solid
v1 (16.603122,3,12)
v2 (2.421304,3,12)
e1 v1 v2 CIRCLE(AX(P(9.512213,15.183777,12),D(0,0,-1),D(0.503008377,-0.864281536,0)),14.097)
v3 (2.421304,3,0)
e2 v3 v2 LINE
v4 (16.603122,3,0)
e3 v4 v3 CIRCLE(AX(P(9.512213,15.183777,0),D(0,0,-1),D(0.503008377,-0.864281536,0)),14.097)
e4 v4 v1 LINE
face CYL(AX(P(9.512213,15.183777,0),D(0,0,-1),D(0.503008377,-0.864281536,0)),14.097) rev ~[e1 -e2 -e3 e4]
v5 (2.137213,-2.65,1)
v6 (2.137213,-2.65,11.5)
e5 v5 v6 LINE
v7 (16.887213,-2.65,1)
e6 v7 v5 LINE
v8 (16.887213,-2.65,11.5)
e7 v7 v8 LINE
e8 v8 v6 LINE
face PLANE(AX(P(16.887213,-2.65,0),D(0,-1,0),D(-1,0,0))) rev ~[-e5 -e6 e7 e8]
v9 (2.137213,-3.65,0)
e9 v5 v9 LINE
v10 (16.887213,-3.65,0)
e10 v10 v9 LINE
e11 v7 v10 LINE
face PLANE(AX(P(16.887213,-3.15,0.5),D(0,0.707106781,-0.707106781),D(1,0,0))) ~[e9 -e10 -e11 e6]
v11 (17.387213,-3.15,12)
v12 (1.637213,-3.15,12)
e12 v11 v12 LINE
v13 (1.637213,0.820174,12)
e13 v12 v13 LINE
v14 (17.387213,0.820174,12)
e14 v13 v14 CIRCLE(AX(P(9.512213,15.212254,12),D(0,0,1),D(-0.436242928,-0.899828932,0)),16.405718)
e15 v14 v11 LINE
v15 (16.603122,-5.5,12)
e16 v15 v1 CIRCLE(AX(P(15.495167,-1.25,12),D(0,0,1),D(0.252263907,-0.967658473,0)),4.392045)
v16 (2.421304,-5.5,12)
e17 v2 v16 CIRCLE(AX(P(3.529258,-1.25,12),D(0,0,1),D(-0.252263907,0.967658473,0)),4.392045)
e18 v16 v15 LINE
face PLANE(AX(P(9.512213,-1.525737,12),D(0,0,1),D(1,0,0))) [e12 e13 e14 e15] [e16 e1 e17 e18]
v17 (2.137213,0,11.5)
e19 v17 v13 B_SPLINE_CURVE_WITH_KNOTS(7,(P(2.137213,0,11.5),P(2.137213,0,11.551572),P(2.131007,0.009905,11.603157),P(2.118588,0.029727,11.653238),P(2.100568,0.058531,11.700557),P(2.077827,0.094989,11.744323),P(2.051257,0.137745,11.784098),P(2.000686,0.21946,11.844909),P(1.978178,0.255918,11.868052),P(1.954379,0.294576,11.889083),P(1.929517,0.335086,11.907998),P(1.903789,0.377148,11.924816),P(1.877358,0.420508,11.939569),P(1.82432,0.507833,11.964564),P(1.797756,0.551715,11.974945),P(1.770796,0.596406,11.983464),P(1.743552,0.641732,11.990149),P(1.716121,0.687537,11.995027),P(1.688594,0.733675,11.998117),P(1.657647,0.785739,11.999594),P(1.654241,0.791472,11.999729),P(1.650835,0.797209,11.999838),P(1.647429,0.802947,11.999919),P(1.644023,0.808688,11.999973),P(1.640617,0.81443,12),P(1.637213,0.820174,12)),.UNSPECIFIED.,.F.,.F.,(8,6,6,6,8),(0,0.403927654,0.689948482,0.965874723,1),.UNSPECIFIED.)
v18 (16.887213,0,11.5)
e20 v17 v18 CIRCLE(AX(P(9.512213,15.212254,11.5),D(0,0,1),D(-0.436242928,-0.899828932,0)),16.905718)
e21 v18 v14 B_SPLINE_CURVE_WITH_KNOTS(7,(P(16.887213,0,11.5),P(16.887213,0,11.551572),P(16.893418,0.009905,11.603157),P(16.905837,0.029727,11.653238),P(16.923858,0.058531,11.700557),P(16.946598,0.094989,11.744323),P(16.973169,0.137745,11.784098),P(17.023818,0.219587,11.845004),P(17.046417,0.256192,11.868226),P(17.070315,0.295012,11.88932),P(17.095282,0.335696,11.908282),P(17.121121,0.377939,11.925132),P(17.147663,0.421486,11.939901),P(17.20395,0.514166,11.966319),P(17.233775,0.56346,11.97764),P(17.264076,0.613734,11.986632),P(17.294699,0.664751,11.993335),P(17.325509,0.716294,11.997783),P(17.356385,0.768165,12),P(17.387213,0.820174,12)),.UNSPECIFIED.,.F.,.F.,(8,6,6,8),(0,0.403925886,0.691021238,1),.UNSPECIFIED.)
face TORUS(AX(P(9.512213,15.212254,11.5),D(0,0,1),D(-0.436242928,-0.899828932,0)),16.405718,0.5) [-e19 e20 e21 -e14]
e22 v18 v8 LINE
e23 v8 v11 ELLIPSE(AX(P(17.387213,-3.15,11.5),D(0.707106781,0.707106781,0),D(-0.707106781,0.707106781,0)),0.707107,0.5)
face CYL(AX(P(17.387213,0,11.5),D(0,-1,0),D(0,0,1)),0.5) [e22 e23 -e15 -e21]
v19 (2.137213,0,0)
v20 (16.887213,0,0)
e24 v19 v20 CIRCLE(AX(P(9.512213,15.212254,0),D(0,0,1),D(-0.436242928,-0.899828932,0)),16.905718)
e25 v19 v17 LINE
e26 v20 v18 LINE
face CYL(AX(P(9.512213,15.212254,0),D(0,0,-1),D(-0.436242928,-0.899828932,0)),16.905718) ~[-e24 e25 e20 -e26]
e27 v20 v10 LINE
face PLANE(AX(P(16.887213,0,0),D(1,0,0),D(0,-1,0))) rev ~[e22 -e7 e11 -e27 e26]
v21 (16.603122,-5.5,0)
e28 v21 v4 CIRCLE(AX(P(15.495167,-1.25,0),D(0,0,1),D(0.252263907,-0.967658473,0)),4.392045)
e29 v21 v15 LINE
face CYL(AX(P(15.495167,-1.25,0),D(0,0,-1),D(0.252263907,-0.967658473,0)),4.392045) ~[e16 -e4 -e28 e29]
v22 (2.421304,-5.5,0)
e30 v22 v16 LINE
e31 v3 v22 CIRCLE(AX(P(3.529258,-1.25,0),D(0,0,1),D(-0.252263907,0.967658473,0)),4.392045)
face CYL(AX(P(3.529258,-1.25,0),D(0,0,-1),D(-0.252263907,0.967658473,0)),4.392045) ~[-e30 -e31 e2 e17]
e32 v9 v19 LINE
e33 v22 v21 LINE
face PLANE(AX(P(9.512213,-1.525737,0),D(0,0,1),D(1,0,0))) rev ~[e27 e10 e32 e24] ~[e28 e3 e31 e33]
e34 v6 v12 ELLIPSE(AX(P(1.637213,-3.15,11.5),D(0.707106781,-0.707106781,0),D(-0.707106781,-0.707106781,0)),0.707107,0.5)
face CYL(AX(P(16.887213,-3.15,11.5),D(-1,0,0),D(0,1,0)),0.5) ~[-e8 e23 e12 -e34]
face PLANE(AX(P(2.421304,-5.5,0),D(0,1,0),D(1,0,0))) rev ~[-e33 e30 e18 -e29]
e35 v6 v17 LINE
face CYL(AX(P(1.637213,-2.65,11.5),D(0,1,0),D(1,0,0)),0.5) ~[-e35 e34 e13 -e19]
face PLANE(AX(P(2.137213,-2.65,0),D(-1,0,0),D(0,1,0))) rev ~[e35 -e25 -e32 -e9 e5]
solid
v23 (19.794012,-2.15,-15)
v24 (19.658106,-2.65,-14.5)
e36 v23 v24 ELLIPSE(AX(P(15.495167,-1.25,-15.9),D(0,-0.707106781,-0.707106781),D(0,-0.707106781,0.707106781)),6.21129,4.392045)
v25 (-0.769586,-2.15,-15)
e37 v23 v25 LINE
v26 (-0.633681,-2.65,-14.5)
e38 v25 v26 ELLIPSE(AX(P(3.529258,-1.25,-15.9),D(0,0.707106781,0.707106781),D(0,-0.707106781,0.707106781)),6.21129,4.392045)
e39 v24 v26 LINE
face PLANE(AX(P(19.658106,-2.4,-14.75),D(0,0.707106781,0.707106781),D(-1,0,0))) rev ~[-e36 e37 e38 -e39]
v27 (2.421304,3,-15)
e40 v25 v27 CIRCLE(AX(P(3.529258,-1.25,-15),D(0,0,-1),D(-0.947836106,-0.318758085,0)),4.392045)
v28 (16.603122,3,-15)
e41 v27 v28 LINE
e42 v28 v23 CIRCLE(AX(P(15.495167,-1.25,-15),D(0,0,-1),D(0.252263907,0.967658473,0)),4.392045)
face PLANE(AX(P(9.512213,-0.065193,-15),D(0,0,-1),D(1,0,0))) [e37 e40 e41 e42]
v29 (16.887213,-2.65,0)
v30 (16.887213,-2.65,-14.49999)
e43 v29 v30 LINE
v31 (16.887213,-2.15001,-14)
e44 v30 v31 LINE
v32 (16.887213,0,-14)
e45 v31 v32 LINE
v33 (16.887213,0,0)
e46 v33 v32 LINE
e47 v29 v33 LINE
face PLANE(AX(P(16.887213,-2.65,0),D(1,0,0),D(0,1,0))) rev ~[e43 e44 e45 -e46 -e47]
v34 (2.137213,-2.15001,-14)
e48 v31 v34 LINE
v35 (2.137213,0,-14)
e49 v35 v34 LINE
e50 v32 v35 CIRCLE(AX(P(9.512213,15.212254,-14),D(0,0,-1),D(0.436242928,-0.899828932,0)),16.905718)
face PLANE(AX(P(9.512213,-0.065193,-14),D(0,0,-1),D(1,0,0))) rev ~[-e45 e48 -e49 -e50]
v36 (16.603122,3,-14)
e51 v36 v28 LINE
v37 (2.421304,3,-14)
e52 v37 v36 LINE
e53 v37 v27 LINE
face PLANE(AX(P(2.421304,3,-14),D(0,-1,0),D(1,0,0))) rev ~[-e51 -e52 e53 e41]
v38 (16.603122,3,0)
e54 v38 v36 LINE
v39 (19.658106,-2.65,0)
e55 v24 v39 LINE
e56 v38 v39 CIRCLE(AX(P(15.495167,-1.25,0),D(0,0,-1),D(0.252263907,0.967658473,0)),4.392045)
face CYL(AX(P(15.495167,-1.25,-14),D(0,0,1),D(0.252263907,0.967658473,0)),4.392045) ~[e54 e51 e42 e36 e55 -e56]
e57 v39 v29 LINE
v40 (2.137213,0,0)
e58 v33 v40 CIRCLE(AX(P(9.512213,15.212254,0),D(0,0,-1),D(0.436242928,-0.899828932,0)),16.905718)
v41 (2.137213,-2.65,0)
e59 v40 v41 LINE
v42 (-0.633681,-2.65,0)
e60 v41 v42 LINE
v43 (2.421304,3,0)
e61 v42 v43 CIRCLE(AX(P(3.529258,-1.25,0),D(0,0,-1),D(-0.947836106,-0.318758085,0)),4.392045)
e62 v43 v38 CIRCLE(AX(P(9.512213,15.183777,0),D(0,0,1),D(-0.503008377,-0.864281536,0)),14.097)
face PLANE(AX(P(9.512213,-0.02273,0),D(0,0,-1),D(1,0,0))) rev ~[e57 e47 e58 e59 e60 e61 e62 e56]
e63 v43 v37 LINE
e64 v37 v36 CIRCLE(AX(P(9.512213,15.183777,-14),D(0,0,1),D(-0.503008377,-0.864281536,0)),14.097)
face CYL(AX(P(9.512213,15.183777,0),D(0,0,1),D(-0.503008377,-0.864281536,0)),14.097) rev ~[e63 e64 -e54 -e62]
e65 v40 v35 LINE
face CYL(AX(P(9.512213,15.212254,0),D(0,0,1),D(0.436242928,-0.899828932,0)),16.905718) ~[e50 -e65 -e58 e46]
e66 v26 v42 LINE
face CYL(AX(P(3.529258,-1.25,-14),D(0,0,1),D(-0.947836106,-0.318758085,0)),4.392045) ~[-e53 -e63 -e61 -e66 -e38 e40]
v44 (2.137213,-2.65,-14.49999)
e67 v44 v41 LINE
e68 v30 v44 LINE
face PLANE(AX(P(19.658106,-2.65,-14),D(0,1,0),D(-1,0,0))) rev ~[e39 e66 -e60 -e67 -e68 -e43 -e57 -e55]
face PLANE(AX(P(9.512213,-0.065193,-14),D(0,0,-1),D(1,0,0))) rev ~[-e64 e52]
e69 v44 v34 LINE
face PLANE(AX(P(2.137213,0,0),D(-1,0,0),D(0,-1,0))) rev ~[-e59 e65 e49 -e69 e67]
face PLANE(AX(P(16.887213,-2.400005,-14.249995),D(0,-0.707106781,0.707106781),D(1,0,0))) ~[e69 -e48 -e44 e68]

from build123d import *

# Parameters (mm, degrees)
F1_DEPTH = 12
F3_DEPTH = 14
F5_DEPTH = 1
F6_SIZE  = 0.5
F7_SIZE  = 1
F8_SIZE  = 0.49999
F9_R     = 0.5


# Not quite as in the source:
# - a fillet or chamfer is up to 0.001 mm smaller than in the source, because OpenCascade refuses the exact size


with BuildPart() as f1:
    # F0 (on Top) → F1 (new body)
    with BuildSketch(Plane.XY):
        with BuildLine():
            ThreePointArc((2.421303573, 3), (-0.8627873361, -1.25), (2.421303573, -5.5))
            Line((2.421303573, -5.5), (16.6031217548, -5.5))
            ThreePointArc((16.6031217548, -5.5), (19.8872126639, -1.25), (16.6031217548, 3))
            ThreePointArc((16.6031217548, 3), (9.5122126639, 1.0867768062), (2.421303573, 3))
        make_face()
        with BuildLine():
            Line((4.6372126639, -2.65), (2.1372126639, -2.65))
            Line((2.1372126639, -2.65), (2.1372126639, 0))
            ThreePointArc((2.1372126639, 0), (9.5122126639, -1.6934638377), (16.8872126639, 0))
            Line((16.8872126639, 0), (16.8872126639, -2.65))
            Line((16.8872126639, -2.65), (4.6372126639, -2.65))
        make_face(mode=Mode.SUBTRACT)
    extrude(amount=F1_DEPTH)

    # F7
    f7_edges = [f1.edges().sort_by_distance(p)[0] for p in [
        (9.512213, -2.65, 0),
    ]]
    chamfer(f7_edges, length=F7_SIZE)

    # F9
    f9_edges = [f1.edges().sort_by_distance(p)[0] for p in [
        (9.512213, -2.65, 12),
        (2.137213, -1.325, 12),
        (9.512213, -1.693464, 12),
        (16.887213, -1.325, 12),
    ]]
    fillet(f9_edges, radius=F9_R)


with BuildPart() as f3:
    # F2 (on face) → F3 (new body)
    with BuildSketch(Plane(origin=(0, 0, 0), x_dir=(1, 0, 0), z_dir=(0, 0, -1))):
        with BuildLine():
            ThreePointArc((-0.6336811406, 2.65), (-0.3341866365, -0.8389848971), (2.421303573, -3))
            ThreePointArc((2.421303573, -3), (9.5122126639, -1.0867768062), (16.6031217548, -3))
            ThreePointArc((16.6031217548, -3), (19.3586119643, -0.8389848971), (19.6581064684, 2.65))
            Line((19.6581064684, 2.65), (16.8872126639, 2.65))
            Line((16.8872126639, 2.65), (16.8872126639, 0))
            ThreePointArc((16.8872126639, 0), (9.5122126639, 1.6934638377), (2.1372126639, 0))
            Line((2.1372126639, 0), (2.1372126639, 2.65))
            Line((2.1372126639, 2.65), (-0.6336811406, 2.65))
        make_face()
    extrude(amount=F3_DEPTH)

    # F4 (on face) → F5 (join)
    with BuildSketch(Plane(origin=(0, 0, -14), x_dir=(1, 0, 0), z_dir=(0, 0, -1))):
        with BuildLine():
            ThreePointArc((-0.6336811406, 2.65), (-0.3341866365, -0.8389848971), (2.421303573, -3))
            Line((2.421303573, -3), (16.6031217548, -3))
            ThreePointArc((16.6031217548, -3), (19.3586119643, -0.8389848971), (19.6581064684, 2.65))
            Line((19.6581064684, 2.65), (-0.6336811406, 2.65))
        make_face()
    extrude(amount=F5_DEPTH)

    # F6
    f6_edges = [f3.edges().sort_by_distance(p)[0] for p in [
        (9.512213, -2.65, -15),
    ]]
    chamfer(f6_edges, length=F6_SIZE)

    # F8 (size 0.5 in the source; OpenCascade refuses exactly that, so slightly less here)
    f8_edges = [f3.edges().sort_by_distance(p)[0] for p in [
        (9.512213, -2.65, -14),
    ]]
    chamfer(f8_edges, length=F8_SIZE)


solid = Compound([f1.part, f3.part])
